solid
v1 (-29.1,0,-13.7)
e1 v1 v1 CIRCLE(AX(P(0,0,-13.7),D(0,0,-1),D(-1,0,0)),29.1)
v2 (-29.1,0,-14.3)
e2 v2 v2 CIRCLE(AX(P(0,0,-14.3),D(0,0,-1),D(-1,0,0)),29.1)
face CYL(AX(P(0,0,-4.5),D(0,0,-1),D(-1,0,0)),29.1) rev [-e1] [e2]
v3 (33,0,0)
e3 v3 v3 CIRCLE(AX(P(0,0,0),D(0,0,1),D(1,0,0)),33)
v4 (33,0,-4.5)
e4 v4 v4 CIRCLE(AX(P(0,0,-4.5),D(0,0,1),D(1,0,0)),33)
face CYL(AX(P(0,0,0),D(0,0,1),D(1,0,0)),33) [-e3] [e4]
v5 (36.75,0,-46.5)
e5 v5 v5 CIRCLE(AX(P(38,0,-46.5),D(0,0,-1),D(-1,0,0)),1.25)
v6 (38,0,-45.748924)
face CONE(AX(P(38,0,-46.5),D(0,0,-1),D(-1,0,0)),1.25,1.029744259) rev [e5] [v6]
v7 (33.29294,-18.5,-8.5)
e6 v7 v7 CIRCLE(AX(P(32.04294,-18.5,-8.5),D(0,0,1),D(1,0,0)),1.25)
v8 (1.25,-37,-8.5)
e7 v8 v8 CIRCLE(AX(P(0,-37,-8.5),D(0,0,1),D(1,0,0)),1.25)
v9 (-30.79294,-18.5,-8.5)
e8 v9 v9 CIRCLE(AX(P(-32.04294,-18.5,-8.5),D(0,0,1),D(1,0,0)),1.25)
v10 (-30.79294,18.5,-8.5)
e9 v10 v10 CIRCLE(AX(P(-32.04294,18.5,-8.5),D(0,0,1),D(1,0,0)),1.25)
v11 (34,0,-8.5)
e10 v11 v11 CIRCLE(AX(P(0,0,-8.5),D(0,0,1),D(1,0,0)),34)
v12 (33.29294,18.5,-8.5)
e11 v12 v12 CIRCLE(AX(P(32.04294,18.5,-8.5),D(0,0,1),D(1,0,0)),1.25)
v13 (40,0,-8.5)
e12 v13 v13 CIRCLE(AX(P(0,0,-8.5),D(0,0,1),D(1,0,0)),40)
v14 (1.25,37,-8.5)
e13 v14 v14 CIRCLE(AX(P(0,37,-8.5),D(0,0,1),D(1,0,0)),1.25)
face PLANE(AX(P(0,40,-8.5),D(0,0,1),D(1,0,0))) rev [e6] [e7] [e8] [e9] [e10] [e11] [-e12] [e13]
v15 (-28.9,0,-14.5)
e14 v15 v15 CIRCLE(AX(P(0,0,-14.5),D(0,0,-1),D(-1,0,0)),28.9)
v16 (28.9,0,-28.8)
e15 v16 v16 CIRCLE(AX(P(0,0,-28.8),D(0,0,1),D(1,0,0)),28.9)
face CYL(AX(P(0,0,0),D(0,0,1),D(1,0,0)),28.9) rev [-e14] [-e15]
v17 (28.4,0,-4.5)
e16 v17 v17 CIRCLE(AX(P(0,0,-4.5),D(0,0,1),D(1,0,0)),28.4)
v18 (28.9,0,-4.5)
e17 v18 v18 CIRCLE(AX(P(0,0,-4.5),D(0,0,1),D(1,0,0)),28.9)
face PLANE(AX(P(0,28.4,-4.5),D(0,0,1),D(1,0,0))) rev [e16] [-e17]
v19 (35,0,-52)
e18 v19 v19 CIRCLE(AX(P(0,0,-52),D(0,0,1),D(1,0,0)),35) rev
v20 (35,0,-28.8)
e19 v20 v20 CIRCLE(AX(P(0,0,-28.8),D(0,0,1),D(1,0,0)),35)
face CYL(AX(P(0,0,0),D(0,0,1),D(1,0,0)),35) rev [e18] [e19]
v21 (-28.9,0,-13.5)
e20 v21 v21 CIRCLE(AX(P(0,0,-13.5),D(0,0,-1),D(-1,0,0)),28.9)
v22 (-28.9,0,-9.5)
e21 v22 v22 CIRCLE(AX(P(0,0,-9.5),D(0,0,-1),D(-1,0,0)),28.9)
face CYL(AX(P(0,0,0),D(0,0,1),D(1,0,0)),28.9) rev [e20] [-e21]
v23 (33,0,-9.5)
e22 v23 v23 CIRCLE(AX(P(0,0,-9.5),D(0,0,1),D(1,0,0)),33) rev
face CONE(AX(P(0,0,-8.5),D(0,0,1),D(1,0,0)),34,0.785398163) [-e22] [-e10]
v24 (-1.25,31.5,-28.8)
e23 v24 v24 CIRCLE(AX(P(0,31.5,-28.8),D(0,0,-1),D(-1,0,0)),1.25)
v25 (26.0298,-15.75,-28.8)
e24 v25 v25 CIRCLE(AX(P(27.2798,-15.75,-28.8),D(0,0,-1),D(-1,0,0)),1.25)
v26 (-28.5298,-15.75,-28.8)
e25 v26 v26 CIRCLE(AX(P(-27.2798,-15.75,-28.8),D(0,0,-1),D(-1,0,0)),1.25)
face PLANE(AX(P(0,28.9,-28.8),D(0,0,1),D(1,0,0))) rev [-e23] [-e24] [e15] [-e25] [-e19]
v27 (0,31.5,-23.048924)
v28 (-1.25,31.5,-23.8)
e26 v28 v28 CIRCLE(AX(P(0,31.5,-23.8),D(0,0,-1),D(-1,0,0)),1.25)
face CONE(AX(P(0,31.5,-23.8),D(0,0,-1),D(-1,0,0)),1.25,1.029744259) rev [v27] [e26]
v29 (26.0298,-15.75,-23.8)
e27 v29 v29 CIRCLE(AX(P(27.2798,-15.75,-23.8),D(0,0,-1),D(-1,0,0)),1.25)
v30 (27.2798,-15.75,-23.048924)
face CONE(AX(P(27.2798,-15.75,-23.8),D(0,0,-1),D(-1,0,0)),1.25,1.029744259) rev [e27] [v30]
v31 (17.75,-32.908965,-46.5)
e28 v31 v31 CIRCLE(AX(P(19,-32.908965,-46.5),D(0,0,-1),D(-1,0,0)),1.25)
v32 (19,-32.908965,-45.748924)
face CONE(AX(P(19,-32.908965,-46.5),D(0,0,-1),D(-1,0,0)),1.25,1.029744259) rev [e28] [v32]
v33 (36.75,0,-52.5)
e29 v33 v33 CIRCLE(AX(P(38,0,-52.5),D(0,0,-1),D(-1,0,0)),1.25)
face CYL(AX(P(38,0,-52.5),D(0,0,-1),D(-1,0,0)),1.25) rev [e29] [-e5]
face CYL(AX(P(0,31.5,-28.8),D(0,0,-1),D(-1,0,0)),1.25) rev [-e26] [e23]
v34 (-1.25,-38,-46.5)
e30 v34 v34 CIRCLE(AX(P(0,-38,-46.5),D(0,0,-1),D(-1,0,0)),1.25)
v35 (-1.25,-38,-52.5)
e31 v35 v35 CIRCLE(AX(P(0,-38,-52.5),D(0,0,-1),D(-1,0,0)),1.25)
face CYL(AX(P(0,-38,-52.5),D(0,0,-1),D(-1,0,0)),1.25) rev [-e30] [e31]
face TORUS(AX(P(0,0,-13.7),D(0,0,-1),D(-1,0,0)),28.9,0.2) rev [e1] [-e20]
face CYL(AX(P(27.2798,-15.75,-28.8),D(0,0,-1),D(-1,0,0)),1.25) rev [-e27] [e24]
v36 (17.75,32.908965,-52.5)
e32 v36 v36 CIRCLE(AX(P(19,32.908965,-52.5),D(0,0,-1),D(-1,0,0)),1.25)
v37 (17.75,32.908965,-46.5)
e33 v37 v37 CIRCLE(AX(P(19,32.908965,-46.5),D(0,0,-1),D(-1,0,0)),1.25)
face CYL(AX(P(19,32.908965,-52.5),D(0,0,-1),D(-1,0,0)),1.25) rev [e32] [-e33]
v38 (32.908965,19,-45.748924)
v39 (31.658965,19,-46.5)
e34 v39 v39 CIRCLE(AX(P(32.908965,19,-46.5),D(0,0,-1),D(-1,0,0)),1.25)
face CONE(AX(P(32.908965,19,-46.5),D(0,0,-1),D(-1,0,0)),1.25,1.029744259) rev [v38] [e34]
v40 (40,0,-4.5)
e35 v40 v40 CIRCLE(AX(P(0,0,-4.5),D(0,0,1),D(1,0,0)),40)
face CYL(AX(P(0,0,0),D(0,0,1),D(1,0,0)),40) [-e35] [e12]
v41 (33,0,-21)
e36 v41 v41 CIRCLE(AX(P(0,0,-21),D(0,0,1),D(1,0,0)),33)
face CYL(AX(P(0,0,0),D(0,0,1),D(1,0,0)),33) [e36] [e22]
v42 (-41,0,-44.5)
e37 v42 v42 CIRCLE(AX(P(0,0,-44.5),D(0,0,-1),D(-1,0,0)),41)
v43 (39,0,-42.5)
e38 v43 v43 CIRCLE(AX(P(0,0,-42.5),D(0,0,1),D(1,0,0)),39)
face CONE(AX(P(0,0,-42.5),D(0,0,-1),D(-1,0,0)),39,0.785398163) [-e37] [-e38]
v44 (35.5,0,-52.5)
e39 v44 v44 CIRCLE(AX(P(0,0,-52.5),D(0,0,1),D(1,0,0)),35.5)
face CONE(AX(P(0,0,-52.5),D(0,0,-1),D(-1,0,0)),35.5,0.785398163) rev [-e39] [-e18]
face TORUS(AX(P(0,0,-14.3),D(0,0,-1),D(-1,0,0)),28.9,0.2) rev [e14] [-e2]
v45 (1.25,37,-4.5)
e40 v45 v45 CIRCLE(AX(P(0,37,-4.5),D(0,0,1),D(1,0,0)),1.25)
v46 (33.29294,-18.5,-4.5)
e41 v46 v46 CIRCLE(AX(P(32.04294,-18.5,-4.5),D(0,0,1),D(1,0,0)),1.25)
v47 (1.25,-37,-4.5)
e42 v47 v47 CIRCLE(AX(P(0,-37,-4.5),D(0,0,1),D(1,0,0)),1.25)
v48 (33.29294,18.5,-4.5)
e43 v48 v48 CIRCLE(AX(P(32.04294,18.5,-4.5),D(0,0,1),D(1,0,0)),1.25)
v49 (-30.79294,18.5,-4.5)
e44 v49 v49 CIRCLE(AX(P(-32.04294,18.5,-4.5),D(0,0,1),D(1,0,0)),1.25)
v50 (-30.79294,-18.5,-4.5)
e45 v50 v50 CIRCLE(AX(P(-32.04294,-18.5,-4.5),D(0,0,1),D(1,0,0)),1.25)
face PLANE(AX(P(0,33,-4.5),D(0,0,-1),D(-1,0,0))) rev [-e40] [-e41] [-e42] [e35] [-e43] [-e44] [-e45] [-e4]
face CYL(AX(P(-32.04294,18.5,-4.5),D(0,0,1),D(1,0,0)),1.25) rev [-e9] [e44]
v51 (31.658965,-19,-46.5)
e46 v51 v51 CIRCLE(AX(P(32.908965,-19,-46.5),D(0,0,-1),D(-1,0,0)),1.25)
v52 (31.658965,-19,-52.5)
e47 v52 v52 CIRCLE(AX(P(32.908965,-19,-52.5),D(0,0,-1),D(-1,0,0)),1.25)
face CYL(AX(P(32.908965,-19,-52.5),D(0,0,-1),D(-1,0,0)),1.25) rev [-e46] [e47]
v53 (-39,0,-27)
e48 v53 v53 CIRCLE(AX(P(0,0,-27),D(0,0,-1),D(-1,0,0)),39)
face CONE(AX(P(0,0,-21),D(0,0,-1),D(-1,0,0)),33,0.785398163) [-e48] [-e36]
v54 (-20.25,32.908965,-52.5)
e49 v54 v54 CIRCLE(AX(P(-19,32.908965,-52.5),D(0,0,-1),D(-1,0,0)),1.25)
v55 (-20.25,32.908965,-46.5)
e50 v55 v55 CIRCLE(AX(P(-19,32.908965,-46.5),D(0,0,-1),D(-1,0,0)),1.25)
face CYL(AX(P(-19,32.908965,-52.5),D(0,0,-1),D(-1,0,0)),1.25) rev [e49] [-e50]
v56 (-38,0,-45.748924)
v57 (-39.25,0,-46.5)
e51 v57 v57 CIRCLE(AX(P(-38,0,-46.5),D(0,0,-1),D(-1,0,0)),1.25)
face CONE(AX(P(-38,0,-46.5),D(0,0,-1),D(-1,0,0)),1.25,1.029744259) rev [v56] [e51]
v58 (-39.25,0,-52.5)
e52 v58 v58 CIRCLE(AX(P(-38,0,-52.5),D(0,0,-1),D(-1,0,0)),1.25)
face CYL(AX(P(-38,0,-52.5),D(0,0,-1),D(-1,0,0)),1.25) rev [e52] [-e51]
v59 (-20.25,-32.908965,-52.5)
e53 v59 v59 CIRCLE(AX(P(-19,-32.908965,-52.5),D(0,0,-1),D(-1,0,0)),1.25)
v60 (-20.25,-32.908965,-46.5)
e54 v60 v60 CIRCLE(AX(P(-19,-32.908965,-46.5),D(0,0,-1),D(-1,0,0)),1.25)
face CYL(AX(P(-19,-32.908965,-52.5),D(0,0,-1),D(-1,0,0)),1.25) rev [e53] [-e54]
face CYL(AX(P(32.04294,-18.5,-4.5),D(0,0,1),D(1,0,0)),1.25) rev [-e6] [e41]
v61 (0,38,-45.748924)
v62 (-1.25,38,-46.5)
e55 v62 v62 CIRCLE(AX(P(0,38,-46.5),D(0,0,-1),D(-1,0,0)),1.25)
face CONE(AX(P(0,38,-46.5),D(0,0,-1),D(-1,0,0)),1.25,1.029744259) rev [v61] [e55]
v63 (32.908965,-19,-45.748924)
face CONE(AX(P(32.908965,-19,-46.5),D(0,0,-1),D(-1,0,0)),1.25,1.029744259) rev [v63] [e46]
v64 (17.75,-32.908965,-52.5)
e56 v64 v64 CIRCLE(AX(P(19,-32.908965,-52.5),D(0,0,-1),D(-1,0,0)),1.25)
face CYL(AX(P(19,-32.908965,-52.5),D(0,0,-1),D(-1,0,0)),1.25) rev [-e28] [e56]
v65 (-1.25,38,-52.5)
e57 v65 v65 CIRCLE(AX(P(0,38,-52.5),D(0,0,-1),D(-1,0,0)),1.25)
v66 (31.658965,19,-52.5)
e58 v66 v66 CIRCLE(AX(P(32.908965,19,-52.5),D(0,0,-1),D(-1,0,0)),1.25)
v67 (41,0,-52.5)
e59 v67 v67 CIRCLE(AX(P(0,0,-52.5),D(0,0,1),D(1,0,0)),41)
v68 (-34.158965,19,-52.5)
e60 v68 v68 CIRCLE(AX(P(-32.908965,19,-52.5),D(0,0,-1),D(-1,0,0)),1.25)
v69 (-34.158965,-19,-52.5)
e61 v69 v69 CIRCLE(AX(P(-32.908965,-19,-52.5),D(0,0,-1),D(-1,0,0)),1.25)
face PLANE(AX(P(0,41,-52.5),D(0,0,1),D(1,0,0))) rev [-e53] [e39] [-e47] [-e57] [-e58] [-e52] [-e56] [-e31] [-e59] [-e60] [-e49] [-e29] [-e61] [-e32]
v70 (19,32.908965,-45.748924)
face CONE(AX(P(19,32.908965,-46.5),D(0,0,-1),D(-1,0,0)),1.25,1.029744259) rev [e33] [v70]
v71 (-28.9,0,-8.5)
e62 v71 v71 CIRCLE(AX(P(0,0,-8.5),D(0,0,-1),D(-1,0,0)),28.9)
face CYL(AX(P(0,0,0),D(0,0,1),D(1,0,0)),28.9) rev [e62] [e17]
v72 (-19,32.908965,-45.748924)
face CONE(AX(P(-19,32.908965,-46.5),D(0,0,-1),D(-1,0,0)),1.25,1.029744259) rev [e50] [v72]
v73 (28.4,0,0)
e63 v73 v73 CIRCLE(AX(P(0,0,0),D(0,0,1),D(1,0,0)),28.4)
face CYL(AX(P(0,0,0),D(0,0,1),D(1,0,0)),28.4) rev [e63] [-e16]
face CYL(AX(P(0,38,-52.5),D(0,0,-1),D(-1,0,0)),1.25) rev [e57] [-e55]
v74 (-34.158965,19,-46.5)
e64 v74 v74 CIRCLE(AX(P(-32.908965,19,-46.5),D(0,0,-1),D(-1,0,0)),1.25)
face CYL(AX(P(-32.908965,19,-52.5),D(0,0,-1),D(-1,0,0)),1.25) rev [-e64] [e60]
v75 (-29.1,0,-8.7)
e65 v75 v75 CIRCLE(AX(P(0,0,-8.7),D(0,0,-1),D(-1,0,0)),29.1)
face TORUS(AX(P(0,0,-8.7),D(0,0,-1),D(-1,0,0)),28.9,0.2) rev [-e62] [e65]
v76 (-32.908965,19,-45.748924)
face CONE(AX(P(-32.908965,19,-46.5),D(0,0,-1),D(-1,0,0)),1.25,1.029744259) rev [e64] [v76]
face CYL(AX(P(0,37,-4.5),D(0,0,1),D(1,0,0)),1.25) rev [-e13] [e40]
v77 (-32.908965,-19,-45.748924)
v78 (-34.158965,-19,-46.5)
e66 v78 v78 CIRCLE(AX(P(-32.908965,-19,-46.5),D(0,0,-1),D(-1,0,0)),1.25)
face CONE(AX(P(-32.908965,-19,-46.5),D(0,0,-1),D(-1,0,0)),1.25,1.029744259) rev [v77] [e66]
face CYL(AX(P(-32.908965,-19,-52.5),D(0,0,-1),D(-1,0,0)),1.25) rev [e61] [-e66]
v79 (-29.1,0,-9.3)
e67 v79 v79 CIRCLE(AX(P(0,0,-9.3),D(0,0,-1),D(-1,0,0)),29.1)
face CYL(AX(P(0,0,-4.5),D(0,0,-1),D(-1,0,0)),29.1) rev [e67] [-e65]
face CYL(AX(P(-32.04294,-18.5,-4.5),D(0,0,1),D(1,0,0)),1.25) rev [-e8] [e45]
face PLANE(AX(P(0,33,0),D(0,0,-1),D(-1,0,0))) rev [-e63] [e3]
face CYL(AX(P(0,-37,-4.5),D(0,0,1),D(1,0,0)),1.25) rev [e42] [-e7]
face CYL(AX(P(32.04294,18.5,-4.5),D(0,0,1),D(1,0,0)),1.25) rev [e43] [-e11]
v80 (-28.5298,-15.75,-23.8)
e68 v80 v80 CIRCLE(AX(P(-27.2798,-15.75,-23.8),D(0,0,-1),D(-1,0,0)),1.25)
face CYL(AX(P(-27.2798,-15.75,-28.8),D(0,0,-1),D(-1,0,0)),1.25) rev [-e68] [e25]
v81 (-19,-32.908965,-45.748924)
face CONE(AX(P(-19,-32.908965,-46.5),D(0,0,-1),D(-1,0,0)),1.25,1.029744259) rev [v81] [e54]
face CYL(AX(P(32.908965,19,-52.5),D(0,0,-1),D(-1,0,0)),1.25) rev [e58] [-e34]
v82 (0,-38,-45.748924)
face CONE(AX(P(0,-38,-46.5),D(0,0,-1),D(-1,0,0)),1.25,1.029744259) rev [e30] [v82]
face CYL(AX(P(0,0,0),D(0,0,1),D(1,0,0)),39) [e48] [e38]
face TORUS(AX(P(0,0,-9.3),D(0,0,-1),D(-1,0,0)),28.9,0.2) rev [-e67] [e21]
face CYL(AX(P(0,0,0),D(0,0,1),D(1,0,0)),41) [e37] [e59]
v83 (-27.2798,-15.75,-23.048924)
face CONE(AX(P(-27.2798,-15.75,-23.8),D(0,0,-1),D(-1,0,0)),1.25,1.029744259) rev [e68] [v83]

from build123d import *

# Parameters (mm, degrees)
OTHER_START              = -8.5
OTHER_2_OUTLINE_R        = 1.25
OTHER_2_DEPTH            = 4
PATTERN_CIRCULAR_1_COUNT = 6
PATTERN_CIRCULAR_2_COUNT = 3
PATTERN_CIRCULAR_3_COUNT = 12
CHAMFER_1_SIZE           = 1
CHAMFER_2_SIZE           = 2
CHAMFER_3_SIZE           = 0.5
CHAMFER_4_SIZE           = 6


# Read off the part's stored shape, not the designer's step: 高级异型孔2, 高级异型孔3, 高级异型孔4
with BuildPart() as part:
    # 草图2 → 旋转2 (revolve)
    with BuildSketch(Plane(origin=(0, 0, 0), x_dir=(0, 0, -1), z_dir=(1, 0, 0)), mode=Mode.PRIVATE) as revolve_2_sk:
        Polygon((0, 33), (0, 28.4), (4.5, 28.4), (4.5, 28.9), (28.8, 28.9), (28.8, 35), (52.5, 35), (52.5, 41), (42.5, 41), (42.5, 39), (21, 39), (21, 33), (8.5, 33), (8.5, 40), (4.5, 40), (4.5, 33), align=None)
    revolve(revolve_2_sk.sketch.rotate(Axis((0, 0, 0), (0, 0, -1)), 90), axis=Axis((0, 0, 0), (0, 0, -1)))

    # 高级异型孔2 outline → 高级异型孔2 (cut)
    with BuildSketch(Plane.XY.offset(OTHER_START)):
        with Locations((0, 37)):
            Circle(OTHER_2_OUTLINE_R)
    other_2 = extrude(amount=OTHER_2_DEPTH, mode=Mode.SUBTRACT)

    # 高级异型孔3 outline → 高级异型孔3 (revolve, cut)
    with BuildSketch(Plane.XZ.offset(-31.5)):
        Polygon((1.25, -28.8), (1.25, -23.8), (0, -23.048924226), (0, -28.8), align=None)
    other_3 = revolve(axis=Axis((0, 31.5, 0), (0, 0, 1)), mode=Mode.SUBTRACT)

    # 高级异型孔4 outline → 高级异型孔4 (revolve, cut)
    with BuildSketch(Plane.XZ.offset(-38)):
        Polygon((1.25, -52.5), (1.25, -46.5), (0, -45.748924226), (0, -52.5), align=None)
    other_4 = revolve(axis=Axis((0, 38, 0), (0, 0, 1)), mode=Mode.SUBTRACT)

    # 阵列(圆周)1: 高级异型孔2 ×6 about axis
    pattern_circular_1_axis = Axis((0, 0, 0), (0, 0, 1))
    for i in range(1, PATTERN_CIRCULAR_1_COUNT):
        add(other_2.rotate(pattern_circular_1_axis, i * 360 / PATTERN_CIRCULAR_1_COUNT), mode=Mode.SUBTRACT)

    # 阵列(圆周)2: 高级异型孔3 ×3 about axis
    pattern_circular_2_axis = Axis((0, 0, 0), (0, 0, 1))
    for i in range(1, PATTERN_CIRCULAR_2_COUNT):
        add(other_3.rotate(pattern_circular_2_axis, i * 360 / PATTERN_CIRCULAR_2_COUNT), mode=Mode.SUBTRACT)

    # 阵列(圆周)3: 高级异型孔4 ×12 about axis
    pattern_circular_3_axis = Axis((0, 0, 0), (0, 0, 1))
    for i in range(1, PATTERN_CIRCULAR_3_COUNT):
        add(other_4.rotate(pattern_circular_3_axis, i * 360 / PATTERN_CIRCULAR_3_COUNT), mode=Mode.SUBTRACT)

    # 倒角1
    chamfer_1_edges = [part.edges().sort_by_distance(p)[0] for p in [
        (-33, 0, -8.5),
    ]]
    chamfer(chamfer_1_edges, length=CHAMFER_1_SIZE)

    # 倒角2
    chamfer_2_edges = [part.edges().sort_by_distance(p)[0] for p in [
        (-41, 0, -42.5),
    ]]
    chamfer(chamfer_2_edges, length=CHAMFER_2_SIZE - 0.0001)  # a hair under: the kernel refuses the full size

    # 倒角3
    chamfer_3_edges = [part.edges().sort_by_distance(p)[0] for p in [
        (-35, 0, -52.5),
    ]]
    chamfer(chamfer_3_edges, length=CHAMFER_3_SIZE)

    # 倒角4
    chamfer_4_edges = [part.edges().sort_by_distance(p)[0] for p in [
        (-39, 0, -21),
    ]]
    chamfer(chamfer_4_edges, length=CHAMFER_4_SIZE - 0.0001)  # a hair under: the kernel refuses the full size

    # 草图16 → 切除-旋转1 (revolve, cut)
    with BuildSketch(Plane(origin=(0, 0, 0), x_dir=(0, 0, -1), z_dir=(1, 0, 0)), mode=Mode.PRIVATE) as cut_revolve_1_sk:
        with BuildLine():
            Line((13.7, 29.1), (14.3, 29.1))
            ThreePointArc((14.3, 29.1), (14.441421356, 29.041421356), (14.5, 28.9))
            Line((14.5, 28.9), (14.5, 28.7))
            Line((14.5, 28.7), (13.5, 28.7))
            Line((13.5, 28.7), (13.5, 28.9))
            ThreePointArc((13.5, 28.9), (13.558578644, 29.041421356), (13.7, 29.1))
        make_face()
        with BuildLine():
            Line((8.5, 28.7), (9.5, 28.7))
            Line((9.5, 28.7), (9.5, 28.9))
            ThreePointArc((9.5, 28.9), (9.441421356, 29.041421356), (9.3, 29.1))
            Line((9.3, 29.1), (8.7, 29.1))
            ThreePointArc((8.7, 29.1), (8.558578644, 29.041421356), (8.5, 28.9))
            Line((8.5, 28.9), (8.5, 28.7))
        make_face()
    revolve(cut_revolve_1_sk.sketch.rotate(Axis((0, 0, -4.5), (0, 0, 1)), 90), axis=Axis((0, 0, -4.5), (0, 0, 1)), mode=Mode.SUBTRACT)


solid = part.part
